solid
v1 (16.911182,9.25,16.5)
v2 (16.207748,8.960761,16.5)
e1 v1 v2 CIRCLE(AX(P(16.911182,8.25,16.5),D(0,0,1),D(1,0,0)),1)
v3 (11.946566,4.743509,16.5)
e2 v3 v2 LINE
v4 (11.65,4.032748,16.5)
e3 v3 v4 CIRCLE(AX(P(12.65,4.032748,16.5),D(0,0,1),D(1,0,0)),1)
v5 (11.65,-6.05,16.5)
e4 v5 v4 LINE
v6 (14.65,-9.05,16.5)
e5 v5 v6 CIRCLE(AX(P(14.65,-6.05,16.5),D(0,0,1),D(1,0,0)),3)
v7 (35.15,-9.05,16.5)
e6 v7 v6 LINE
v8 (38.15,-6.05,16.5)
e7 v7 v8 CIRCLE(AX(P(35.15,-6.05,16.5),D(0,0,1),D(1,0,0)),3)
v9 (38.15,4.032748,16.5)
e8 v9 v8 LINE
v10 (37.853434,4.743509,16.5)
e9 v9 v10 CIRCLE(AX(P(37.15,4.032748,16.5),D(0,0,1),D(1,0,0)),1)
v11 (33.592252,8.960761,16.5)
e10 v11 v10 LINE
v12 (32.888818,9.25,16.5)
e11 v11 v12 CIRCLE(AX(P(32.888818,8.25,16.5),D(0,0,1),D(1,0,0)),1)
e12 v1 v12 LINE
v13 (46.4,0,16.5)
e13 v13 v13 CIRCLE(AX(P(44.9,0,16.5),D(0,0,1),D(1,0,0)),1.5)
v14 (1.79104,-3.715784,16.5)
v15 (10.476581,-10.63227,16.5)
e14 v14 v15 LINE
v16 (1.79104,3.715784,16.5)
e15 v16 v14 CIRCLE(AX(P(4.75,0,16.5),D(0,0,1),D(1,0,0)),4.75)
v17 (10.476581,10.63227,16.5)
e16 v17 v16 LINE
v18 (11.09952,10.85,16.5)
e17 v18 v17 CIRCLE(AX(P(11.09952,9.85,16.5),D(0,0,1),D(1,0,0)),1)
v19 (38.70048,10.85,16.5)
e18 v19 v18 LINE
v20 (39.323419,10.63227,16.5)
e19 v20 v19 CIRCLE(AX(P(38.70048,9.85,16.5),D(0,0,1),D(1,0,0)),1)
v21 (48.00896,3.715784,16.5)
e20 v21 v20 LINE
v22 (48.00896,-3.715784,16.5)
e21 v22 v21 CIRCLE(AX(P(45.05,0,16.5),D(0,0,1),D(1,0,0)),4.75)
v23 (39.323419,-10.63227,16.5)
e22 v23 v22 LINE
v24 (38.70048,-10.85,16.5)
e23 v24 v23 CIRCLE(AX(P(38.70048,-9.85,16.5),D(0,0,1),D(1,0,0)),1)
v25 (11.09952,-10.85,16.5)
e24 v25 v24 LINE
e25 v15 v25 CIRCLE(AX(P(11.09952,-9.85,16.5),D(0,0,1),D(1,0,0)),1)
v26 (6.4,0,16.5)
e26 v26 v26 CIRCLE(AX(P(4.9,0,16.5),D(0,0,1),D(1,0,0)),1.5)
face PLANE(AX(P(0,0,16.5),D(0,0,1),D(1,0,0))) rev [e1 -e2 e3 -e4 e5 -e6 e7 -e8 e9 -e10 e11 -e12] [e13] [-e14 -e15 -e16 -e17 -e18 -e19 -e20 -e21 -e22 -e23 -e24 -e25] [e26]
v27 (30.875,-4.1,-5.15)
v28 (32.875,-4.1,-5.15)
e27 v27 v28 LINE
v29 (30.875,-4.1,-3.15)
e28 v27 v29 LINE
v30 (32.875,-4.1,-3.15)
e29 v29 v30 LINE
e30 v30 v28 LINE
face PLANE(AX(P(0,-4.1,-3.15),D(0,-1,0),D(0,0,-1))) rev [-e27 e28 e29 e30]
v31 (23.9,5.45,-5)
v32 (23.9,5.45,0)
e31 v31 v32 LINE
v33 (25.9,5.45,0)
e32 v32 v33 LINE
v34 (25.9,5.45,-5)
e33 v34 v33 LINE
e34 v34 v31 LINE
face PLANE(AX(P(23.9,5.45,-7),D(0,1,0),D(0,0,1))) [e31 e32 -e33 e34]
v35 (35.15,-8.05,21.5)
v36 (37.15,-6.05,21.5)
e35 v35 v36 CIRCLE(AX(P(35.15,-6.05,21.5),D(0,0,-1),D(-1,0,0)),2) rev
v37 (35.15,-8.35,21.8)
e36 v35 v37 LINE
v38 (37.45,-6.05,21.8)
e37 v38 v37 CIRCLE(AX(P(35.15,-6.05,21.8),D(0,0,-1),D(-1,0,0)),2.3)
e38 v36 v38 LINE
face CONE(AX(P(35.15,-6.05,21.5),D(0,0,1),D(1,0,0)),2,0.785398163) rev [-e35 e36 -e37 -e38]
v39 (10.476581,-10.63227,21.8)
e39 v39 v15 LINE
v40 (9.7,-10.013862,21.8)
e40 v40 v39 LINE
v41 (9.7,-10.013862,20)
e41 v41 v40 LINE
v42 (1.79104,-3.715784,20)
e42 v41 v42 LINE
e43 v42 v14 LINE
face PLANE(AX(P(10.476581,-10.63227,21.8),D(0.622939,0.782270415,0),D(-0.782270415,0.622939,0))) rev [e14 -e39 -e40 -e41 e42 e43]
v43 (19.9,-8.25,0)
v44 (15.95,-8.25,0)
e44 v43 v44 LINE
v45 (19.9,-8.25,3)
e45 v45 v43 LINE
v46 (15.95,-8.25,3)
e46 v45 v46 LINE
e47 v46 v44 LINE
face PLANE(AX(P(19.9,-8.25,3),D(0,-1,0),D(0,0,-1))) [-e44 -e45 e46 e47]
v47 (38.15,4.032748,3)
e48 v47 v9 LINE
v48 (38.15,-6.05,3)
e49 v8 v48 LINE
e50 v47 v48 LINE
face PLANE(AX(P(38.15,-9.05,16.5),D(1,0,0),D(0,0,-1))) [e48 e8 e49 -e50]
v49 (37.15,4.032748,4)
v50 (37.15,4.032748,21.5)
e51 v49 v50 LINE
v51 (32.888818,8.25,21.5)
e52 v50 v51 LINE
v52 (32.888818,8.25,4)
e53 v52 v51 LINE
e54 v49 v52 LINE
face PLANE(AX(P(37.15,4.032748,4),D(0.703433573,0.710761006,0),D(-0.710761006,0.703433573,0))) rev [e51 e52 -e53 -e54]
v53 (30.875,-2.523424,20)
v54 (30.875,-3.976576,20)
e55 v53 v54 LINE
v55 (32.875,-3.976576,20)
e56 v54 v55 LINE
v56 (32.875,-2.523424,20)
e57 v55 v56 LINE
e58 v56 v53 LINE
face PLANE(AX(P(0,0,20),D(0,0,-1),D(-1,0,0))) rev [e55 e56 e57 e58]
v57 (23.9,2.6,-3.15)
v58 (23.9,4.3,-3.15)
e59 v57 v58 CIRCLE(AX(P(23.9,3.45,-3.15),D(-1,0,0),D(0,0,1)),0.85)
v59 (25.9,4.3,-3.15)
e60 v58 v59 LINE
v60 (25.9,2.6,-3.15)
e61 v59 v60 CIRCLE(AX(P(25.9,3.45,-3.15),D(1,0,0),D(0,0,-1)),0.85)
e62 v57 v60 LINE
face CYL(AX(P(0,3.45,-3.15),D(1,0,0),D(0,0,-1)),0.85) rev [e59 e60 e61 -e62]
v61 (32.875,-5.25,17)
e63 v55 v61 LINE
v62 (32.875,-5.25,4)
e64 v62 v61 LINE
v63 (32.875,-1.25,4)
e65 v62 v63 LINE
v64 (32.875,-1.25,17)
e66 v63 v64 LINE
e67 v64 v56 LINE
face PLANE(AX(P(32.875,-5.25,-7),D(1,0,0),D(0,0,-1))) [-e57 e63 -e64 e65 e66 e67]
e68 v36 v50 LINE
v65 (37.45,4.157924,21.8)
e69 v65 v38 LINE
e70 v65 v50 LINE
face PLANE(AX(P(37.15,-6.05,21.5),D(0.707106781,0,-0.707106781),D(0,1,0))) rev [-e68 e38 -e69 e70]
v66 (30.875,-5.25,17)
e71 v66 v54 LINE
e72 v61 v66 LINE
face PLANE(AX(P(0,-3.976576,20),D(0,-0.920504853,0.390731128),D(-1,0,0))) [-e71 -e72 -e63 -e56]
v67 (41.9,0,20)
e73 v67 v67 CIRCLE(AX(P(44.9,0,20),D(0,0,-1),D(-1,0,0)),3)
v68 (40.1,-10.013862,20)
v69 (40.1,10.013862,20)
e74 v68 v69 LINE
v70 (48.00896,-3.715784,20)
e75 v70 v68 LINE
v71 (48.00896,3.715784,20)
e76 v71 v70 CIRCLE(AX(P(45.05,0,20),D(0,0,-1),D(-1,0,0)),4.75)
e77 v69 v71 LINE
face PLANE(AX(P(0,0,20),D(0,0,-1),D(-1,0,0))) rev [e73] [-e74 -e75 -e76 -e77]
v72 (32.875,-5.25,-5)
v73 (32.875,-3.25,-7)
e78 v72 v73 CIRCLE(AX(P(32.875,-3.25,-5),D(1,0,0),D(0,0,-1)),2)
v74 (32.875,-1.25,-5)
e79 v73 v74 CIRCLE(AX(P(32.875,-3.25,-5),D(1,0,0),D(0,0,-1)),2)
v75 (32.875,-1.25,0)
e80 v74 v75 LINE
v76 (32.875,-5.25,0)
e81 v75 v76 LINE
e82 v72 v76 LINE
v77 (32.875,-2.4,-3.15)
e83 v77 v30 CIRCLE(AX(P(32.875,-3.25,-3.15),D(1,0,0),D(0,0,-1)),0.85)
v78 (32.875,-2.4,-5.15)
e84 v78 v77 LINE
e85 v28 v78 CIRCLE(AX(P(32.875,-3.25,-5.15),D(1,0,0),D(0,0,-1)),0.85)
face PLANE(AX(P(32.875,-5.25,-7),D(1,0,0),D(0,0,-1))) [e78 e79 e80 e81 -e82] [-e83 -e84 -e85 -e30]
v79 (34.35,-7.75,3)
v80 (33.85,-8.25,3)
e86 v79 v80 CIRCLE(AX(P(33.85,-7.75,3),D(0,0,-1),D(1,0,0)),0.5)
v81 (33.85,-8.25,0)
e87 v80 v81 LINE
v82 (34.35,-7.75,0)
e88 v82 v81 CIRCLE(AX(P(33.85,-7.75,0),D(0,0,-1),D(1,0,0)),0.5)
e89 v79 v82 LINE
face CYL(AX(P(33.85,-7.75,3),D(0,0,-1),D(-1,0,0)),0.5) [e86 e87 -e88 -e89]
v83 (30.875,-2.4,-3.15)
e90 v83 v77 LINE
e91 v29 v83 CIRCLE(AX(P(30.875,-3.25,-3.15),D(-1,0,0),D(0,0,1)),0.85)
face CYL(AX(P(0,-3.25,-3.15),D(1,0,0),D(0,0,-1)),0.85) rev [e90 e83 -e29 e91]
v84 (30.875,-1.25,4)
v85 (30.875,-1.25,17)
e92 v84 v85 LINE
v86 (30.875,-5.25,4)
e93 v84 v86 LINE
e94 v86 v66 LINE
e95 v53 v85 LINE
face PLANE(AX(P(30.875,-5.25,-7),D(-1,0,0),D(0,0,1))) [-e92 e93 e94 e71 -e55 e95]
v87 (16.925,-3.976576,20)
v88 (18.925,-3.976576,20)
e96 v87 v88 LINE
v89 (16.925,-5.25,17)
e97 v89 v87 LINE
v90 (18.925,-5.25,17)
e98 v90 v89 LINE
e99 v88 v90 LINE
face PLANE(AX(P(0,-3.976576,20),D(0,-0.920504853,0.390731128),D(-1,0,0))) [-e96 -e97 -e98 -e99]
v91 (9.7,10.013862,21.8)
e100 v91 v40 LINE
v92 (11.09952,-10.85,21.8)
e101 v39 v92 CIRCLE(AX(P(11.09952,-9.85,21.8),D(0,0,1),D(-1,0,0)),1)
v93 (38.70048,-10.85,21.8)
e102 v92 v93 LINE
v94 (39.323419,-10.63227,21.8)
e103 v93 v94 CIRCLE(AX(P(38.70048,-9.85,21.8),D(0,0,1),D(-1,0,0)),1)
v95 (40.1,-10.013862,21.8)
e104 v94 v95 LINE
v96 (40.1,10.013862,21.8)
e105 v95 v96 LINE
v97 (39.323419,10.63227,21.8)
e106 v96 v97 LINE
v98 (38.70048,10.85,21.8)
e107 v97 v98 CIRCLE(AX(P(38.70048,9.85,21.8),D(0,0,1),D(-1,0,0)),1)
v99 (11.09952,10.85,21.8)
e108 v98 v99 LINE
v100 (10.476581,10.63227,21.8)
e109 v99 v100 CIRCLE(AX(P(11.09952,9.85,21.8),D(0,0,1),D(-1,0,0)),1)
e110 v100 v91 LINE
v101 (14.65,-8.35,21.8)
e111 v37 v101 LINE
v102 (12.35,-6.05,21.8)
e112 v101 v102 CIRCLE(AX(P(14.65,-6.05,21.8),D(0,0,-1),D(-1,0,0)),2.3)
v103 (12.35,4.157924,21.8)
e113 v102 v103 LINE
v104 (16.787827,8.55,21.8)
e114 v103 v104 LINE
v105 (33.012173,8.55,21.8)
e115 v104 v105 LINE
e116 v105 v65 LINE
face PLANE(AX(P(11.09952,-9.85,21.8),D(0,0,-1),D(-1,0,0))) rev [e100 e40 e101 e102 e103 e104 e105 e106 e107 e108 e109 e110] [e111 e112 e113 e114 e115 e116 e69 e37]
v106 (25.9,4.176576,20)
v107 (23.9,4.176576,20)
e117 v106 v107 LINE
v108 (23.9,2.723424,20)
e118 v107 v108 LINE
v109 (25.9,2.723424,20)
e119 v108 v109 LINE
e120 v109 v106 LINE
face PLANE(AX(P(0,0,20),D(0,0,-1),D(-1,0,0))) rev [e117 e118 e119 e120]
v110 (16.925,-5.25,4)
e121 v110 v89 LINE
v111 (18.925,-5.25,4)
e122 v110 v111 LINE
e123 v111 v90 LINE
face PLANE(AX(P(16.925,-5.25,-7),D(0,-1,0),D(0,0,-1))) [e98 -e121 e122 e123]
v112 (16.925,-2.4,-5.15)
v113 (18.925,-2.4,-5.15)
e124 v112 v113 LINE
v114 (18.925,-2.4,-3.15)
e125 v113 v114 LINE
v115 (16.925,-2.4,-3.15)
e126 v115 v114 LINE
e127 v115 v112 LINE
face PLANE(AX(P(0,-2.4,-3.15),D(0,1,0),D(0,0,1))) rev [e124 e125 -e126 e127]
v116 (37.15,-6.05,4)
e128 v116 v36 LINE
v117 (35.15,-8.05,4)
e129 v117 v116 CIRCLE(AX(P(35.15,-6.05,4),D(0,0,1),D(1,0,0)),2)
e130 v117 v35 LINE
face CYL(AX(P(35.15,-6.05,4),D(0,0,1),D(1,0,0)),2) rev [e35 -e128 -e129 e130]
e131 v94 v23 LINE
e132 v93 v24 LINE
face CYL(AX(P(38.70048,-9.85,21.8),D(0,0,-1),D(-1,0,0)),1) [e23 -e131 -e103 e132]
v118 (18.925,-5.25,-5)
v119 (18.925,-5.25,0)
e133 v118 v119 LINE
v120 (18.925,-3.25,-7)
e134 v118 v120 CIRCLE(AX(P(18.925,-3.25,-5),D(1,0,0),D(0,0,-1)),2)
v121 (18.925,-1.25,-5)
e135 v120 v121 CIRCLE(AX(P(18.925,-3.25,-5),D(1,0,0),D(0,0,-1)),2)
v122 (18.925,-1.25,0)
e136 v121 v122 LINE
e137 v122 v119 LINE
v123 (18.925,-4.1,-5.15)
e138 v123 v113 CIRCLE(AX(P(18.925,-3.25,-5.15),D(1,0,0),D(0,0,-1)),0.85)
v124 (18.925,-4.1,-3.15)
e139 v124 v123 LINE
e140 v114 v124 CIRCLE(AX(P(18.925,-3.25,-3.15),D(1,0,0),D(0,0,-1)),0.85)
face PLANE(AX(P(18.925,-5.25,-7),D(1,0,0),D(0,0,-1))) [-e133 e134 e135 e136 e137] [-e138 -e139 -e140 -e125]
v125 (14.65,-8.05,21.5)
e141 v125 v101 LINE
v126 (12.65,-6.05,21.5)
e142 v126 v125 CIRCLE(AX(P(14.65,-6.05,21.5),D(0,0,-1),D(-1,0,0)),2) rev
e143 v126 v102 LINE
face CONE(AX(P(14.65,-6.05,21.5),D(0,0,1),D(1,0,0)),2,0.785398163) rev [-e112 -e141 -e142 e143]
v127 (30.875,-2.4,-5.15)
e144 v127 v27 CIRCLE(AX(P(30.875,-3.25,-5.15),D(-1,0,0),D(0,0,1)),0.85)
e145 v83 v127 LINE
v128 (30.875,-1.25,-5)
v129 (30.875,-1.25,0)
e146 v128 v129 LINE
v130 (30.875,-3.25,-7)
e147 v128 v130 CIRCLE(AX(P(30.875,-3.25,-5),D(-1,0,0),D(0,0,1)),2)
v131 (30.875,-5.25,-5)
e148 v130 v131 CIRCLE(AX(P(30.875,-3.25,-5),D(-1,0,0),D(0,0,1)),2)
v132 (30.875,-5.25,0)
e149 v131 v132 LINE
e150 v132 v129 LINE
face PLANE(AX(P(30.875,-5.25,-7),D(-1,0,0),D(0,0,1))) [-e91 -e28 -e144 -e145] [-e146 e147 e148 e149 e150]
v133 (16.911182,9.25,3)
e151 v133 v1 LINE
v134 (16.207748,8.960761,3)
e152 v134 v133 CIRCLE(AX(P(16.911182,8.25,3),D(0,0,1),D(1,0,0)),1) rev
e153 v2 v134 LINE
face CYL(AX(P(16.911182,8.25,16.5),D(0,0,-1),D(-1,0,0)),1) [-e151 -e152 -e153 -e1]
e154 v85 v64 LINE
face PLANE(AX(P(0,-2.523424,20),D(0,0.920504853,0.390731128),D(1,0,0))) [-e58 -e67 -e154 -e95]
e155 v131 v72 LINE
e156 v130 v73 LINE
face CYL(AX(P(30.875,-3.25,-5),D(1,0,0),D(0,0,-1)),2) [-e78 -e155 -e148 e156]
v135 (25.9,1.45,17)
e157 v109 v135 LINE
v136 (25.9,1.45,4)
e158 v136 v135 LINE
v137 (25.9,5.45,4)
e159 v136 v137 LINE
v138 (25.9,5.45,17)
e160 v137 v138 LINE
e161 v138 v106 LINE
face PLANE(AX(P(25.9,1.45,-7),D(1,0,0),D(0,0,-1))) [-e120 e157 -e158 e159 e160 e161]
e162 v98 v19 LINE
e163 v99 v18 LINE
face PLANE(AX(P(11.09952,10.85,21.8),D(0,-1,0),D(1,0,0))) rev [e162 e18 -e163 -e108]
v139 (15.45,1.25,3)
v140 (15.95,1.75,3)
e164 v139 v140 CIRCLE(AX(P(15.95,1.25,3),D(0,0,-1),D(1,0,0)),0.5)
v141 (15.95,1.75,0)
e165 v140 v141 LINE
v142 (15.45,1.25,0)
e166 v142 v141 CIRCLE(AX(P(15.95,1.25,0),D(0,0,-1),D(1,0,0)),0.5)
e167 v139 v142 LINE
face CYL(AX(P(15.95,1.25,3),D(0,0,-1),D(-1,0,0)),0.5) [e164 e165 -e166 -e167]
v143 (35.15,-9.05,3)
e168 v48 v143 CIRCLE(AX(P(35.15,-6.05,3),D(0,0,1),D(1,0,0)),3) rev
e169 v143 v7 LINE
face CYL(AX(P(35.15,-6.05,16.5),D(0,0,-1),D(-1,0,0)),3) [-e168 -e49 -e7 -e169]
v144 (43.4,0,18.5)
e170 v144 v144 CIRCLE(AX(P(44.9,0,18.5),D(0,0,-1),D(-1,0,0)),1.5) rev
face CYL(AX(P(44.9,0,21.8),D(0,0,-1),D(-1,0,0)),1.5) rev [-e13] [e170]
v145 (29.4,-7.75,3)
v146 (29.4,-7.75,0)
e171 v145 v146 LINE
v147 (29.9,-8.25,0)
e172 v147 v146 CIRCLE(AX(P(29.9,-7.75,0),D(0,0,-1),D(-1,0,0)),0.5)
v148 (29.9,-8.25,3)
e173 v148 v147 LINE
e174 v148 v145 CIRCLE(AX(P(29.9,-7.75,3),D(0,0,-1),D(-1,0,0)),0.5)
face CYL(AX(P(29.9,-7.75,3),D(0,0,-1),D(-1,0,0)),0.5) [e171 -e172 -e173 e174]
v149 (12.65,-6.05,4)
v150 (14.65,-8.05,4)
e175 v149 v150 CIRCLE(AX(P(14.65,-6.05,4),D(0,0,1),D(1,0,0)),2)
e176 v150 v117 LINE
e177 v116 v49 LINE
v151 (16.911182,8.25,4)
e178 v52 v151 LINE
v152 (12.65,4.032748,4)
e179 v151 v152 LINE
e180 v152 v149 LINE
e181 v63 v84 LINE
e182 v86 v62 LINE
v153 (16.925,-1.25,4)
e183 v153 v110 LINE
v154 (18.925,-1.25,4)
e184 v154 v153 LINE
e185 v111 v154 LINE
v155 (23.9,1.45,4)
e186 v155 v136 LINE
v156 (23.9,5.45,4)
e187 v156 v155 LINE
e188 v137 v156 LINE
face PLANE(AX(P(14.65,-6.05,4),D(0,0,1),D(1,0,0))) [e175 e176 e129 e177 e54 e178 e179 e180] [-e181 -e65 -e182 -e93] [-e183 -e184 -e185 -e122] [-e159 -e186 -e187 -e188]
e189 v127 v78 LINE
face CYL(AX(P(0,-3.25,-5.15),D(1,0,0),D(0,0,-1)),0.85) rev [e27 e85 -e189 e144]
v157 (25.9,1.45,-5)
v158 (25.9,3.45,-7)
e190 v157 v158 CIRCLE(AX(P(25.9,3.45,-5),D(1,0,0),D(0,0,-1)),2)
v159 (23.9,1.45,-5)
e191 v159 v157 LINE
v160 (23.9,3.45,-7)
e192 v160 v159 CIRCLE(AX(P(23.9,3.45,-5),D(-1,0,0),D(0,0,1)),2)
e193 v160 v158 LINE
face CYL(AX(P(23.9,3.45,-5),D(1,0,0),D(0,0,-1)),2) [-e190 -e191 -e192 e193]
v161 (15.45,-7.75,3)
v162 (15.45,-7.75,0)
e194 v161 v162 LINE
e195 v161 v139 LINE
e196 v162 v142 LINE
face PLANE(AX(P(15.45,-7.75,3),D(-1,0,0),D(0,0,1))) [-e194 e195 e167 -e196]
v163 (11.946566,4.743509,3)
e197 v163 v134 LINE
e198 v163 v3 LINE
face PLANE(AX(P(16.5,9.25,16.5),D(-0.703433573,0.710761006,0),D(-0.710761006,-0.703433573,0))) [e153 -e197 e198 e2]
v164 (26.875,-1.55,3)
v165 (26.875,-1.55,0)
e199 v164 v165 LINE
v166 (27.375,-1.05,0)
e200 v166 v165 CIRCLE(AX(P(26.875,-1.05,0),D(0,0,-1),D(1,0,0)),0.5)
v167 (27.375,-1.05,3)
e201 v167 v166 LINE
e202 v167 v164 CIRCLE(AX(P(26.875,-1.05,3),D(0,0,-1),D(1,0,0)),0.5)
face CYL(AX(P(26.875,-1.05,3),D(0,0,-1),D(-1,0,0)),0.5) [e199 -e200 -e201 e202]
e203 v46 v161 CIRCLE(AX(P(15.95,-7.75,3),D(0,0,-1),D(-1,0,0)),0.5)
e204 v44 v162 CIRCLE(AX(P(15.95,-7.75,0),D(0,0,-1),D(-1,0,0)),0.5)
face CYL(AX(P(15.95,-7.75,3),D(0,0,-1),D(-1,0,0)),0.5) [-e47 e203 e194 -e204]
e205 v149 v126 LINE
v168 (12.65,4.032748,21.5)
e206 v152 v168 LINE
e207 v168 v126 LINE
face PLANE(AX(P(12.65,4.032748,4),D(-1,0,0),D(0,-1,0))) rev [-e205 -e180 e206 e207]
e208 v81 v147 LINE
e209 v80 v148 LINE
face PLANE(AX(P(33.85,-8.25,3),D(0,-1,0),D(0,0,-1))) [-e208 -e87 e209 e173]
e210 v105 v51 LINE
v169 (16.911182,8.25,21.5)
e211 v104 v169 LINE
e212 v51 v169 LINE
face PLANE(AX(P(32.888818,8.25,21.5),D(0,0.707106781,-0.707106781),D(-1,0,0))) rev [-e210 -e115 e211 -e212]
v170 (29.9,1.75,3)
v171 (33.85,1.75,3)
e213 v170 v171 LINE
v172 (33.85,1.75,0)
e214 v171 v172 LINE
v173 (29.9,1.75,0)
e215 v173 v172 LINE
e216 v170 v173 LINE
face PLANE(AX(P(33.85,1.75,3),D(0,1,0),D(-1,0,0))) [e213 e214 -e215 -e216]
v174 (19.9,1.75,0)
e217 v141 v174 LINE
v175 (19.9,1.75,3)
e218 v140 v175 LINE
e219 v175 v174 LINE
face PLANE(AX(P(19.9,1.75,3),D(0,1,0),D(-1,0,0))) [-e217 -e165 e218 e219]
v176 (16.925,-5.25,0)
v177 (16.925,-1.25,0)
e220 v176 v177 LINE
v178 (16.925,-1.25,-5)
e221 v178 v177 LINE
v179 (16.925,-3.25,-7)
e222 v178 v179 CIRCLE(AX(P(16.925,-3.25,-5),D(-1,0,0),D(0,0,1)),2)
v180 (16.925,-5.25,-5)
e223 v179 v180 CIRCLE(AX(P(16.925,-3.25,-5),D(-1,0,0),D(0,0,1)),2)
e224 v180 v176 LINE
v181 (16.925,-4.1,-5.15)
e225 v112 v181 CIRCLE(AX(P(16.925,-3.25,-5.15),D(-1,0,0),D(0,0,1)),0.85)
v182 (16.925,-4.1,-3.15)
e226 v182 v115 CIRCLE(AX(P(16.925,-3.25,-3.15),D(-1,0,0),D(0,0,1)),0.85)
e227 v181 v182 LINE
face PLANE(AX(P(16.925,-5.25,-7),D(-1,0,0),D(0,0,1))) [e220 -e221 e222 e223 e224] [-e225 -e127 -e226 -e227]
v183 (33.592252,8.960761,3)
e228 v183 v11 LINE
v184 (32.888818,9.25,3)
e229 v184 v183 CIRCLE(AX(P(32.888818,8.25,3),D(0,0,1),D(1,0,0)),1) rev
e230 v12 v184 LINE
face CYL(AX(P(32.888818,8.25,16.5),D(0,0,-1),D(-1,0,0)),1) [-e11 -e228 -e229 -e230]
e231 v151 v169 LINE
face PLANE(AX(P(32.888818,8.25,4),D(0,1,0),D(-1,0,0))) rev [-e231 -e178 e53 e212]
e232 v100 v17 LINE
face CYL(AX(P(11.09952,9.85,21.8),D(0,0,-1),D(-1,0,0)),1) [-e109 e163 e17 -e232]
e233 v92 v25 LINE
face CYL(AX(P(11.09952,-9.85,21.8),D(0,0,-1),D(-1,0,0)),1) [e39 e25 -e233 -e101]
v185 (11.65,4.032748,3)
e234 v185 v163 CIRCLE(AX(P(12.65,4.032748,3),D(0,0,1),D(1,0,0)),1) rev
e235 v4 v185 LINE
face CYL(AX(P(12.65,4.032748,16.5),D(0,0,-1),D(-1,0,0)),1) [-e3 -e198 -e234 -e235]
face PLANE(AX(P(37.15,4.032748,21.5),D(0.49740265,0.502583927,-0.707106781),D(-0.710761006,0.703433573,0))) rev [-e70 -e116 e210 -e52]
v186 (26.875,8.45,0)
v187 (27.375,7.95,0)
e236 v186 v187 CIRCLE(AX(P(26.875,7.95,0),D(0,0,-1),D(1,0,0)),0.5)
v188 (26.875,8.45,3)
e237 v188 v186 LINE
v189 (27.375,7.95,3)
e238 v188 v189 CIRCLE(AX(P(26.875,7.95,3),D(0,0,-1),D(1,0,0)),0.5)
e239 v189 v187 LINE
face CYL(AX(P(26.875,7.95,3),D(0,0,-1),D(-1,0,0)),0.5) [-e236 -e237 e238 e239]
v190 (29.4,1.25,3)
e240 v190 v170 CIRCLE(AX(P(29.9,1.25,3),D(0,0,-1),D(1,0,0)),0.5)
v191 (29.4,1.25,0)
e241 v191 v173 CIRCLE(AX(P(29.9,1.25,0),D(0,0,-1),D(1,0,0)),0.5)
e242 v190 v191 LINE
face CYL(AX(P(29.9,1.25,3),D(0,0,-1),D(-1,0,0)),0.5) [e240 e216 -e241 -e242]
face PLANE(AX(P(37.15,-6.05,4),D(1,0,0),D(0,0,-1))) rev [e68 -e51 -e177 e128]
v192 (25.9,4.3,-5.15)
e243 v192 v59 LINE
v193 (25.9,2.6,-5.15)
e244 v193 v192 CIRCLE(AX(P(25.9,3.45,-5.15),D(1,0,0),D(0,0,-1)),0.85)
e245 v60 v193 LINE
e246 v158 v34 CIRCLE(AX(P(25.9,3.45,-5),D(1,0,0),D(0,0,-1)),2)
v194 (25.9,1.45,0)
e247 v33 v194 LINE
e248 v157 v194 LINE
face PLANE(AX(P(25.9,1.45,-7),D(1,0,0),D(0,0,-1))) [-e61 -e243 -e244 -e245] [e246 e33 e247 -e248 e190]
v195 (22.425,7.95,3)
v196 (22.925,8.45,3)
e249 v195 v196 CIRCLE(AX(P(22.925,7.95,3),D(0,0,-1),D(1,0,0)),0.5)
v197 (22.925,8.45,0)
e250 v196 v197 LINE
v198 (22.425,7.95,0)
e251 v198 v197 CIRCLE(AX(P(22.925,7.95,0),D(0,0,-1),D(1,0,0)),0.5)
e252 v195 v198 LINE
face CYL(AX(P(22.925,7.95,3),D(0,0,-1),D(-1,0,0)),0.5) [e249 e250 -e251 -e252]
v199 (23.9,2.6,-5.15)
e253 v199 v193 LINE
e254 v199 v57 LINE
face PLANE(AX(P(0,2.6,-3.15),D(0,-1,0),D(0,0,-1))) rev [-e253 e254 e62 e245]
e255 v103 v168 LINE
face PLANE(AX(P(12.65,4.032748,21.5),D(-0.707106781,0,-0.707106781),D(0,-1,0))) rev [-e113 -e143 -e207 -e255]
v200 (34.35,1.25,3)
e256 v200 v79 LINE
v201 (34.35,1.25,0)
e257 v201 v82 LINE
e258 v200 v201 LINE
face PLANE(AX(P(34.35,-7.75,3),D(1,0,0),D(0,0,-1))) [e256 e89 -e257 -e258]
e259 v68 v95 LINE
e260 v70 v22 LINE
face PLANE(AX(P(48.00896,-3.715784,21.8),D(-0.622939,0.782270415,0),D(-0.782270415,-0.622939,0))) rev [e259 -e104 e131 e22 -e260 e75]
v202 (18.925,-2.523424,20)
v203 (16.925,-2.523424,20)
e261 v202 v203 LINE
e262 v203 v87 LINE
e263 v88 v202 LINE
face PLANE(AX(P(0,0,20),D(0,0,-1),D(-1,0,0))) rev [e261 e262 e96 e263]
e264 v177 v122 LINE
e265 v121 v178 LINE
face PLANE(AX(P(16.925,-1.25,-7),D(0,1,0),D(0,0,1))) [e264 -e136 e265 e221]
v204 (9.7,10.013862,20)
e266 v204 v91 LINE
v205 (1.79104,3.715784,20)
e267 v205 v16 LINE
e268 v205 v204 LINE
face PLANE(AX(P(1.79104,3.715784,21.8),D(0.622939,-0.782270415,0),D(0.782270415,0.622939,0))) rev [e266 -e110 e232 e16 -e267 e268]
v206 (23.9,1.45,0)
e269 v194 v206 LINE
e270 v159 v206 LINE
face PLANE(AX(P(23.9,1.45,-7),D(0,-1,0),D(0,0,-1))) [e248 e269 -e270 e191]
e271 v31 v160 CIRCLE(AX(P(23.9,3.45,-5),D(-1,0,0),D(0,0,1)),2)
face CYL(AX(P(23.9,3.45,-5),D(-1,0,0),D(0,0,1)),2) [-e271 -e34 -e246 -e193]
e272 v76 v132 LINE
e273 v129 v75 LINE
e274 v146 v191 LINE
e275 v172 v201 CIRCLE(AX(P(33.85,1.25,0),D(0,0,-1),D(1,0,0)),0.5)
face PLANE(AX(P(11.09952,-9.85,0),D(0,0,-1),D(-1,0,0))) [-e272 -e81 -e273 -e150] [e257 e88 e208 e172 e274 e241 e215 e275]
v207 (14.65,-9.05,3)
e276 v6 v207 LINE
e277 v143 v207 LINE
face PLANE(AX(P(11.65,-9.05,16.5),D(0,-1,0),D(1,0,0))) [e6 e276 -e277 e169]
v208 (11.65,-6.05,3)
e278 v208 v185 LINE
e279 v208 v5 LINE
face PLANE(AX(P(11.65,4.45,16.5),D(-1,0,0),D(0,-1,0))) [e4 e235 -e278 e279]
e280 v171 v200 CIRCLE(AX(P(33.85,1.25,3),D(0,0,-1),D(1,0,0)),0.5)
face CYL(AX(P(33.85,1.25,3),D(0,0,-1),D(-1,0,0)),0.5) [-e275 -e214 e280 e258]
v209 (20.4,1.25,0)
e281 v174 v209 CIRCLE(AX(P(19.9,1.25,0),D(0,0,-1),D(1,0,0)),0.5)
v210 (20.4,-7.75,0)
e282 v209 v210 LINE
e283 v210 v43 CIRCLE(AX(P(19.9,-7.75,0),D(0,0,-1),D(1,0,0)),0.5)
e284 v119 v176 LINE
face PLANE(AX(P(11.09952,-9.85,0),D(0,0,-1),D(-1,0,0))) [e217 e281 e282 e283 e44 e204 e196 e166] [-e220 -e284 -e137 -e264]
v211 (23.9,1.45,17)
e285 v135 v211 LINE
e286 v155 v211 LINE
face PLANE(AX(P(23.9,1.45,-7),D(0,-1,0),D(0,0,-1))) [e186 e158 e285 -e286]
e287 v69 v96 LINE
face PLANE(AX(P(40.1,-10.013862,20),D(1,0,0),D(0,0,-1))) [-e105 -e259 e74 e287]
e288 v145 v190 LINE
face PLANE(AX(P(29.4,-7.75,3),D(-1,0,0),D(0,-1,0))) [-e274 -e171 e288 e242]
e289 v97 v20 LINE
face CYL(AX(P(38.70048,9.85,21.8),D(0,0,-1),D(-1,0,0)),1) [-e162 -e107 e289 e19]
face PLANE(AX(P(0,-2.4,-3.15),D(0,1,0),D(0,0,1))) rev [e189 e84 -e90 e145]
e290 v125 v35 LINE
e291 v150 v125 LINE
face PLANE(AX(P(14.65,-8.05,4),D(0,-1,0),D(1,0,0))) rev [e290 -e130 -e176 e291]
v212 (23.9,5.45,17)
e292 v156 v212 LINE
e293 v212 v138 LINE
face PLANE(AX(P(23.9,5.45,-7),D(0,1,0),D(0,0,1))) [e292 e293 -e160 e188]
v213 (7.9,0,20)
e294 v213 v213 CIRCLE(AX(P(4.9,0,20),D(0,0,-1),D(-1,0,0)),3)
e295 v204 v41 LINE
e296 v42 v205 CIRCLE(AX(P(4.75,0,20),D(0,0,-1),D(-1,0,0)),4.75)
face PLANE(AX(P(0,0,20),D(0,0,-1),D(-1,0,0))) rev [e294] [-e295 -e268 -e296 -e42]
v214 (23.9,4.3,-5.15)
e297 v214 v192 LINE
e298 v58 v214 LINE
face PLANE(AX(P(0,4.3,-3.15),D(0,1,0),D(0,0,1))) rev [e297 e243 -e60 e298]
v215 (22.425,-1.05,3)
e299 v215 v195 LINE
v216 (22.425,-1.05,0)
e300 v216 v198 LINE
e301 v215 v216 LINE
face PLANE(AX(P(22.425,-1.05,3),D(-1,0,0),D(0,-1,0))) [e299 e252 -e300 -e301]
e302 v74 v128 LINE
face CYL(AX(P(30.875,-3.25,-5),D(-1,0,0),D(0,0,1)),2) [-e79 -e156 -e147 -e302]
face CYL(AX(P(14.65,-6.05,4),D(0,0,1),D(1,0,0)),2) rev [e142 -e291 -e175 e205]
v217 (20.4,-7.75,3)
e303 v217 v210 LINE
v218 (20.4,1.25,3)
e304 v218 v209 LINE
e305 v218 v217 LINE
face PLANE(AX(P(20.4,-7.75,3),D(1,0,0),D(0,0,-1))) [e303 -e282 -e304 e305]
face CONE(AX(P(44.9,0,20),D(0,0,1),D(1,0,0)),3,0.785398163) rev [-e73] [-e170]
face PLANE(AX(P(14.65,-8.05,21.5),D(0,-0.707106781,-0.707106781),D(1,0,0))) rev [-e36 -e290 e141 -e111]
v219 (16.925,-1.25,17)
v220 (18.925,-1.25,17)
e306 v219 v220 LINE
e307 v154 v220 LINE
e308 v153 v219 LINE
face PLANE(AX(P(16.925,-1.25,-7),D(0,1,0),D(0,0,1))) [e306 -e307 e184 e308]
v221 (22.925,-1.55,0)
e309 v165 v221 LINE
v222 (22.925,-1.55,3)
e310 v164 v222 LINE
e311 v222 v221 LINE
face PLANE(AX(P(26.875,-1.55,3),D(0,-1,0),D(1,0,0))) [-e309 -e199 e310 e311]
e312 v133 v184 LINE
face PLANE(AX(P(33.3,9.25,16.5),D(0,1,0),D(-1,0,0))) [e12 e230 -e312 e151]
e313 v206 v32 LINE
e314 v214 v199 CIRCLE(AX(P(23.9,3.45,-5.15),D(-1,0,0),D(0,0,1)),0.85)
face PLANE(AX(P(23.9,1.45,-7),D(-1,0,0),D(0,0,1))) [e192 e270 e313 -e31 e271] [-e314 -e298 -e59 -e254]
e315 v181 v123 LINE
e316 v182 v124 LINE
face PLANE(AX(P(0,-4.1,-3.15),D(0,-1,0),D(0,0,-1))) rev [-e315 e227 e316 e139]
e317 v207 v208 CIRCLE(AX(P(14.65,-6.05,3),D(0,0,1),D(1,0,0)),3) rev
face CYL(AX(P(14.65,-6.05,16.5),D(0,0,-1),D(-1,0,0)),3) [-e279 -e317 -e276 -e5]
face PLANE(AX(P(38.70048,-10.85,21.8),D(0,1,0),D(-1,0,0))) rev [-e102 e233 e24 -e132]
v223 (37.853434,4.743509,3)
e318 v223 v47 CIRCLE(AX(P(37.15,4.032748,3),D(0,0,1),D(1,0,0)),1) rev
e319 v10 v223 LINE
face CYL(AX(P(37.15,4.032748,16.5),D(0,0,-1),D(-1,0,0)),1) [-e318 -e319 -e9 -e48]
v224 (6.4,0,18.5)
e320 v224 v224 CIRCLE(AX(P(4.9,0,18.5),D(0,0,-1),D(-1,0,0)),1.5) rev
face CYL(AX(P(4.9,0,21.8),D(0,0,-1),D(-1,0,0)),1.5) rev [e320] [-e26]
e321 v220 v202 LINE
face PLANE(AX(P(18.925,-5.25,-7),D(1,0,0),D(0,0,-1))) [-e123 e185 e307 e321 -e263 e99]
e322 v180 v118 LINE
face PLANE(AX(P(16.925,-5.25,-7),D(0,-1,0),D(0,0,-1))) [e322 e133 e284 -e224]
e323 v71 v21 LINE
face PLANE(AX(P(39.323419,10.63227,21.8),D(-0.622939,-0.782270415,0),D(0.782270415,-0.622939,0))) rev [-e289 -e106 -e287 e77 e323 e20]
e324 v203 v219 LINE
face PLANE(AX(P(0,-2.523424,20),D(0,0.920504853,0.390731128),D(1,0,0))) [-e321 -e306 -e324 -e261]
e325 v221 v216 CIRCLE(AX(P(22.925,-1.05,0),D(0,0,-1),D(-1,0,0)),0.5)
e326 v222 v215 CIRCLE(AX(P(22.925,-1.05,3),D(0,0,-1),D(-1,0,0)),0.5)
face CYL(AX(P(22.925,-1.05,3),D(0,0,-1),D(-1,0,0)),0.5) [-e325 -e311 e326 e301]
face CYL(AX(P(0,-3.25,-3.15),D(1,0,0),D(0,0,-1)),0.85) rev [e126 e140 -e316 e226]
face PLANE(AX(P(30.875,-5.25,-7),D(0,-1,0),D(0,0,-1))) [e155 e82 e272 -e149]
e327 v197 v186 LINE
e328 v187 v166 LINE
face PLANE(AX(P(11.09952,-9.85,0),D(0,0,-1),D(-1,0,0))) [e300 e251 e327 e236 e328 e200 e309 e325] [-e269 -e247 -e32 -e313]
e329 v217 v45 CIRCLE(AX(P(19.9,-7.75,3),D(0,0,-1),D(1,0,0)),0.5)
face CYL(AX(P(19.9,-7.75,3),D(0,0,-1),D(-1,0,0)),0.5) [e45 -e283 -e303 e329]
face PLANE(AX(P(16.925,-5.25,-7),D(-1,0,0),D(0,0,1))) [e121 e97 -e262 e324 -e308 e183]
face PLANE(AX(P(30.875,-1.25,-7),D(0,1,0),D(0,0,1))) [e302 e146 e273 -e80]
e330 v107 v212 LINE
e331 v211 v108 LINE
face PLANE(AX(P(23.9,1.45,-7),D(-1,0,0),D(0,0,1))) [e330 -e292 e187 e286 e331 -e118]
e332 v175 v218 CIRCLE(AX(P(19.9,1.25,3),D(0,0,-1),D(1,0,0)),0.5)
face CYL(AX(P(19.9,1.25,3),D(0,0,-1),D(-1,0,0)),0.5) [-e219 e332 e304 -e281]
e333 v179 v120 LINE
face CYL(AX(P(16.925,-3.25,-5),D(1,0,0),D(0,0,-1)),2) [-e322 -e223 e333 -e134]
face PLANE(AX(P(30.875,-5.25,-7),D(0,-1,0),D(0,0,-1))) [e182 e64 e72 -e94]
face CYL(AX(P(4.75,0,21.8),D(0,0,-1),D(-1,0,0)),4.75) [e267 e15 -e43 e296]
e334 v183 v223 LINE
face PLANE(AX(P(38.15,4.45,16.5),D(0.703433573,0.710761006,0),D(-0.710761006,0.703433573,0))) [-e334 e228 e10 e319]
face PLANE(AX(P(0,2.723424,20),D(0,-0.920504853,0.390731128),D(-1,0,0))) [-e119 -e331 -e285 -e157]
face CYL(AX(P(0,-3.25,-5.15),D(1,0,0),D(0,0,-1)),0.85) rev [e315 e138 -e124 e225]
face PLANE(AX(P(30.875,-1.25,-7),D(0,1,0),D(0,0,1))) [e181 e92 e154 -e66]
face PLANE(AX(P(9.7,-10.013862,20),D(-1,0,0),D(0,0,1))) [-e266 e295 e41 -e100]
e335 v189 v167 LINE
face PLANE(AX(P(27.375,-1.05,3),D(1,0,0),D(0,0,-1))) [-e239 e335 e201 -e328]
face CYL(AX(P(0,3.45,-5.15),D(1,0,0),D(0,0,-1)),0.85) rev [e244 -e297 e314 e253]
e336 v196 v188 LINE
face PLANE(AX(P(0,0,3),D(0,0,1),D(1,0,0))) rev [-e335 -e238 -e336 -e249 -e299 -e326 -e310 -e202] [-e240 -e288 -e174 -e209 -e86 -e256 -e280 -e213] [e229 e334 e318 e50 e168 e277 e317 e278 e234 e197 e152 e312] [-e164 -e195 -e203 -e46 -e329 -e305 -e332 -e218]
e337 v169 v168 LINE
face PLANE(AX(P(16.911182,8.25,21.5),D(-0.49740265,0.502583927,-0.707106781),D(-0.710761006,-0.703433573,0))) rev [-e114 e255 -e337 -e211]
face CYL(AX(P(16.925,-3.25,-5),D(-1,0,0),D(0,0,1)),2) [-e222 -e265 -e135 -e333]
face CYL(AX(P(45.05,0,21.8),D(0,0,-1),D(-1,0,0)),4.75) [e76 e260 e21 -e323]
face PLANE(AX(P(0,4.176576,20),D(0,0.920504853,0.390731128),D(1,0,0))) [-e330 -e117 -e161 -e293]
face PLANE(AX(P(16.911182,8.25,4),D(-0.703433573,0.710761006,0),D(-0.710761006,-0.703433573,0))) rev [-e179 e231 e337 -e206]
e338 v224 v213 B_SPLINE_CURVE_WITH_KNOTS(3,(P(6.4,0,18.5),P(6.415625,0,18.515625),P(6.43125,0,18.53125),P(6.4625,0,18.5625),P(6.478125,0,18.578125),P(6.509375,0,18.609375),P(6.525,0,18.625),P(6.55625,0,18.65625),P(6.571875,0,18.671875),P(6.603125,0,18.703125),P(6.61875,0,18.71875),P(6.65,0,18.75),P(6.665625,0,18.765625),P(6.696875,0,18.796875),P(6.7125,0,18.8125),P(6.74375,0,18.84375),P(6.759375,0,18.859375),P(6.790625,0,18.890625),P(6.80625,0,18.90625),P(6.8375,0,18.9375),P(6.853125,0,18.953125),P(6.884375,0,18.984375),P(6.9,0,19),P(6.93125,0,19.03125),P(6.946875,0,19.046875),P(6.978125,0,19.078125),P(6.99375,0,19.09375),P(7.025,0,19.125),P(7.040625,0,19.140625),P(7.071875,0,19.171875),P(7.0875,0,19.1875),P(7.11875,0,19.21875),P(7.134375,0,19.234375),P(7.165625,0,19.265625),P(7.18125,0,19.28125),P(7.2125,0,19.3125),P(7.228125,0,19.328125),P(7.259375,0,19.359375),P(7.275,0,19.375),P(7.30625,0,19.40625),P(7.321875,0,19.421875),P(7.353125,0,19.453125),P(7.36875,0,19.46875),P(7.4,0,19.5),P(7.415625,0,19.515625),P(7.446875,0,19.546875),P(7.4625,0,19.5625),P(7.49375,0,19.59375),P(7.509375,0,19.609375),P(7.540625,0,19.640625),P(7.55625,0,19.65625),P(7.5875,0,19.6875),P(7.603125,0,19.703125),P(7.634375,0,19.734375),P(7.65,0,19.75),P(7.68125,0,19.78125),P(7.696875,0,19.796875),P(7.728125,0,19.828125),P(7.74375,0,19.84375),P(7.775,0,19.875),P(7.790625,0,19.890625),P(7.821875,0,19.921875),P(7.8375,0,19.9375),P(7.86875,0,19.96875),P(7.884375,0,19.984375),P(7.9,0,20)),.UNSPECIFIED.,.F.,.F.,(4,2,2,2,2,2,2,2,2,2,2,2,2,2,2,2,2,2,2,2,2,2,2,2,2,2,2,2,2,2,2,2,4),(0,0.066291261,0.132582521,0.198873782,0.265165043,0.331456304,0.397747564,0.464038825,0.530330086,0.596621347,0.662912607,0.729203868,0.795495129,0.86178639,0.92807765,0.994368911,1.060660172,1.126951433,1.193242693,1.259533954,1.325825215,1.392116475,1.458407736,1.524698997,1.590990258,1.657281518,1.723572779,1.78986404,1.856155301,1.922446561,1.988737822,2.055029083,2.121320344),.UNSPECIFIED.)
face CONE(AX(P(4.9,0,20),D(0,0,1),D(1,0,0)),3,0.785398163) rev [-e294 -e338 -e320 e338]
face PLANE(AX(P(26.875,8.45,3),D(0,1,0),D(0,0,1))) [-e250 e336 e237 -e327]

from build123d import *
from OCP.BRepFilletAPI import BRepFilletAPI_MakeChamfer

# Parameters (mm, degrees)
SKETCH1_R               = 1.5
BOSS_EXTRUDE1_DEPTH     = 21.8
CUT_EXTRUDE1_START      = -1.8
SKETCH2_W               = 54.830632019
SKETCH2_H               = 32.18582254
CUT_EXTRUDE1_DEPTH      = 1.8
SKETCH3_W               = 57.724078453
SKETCH3_H               = 32.716020725
CUT_EXTRUDE2_DEPTH      = 16.5
FILLET1_R               = 3
FILLET2_R               = 1
CUT_EXTRUDE3_DEPTH      = 17.8
CHAMFER1_SIZE           = 0.3
CHAMFER2_SIZE           = 1.5
SKETCH5_W               = 33.078515986
SKETCH5_H               = 22.592086676
CUT_EXTRUDE4_DEPTH      = 3
SKETCH6_W               = 2
SKETCH6_H               = 4
BOSS_EXTRUDE2_DEPTH     = 27
CHAMFER3_SIZE           = 3
CHAMFER3_SIZE2          = 1.273424449
CUT_EXTRUDE5_DEPTH      = 36.549578057
CUT_EXTRUDE5_DEPTH_BACK = 36.549578057
FILLET3_R               = 2


with BuildPart() as part:
    # Sketch1 → Boss-Extrude1 (new body)
    with BuildSketch(Plane.XY):
        with BuildLine():
            Line((1.791039749, 3.715784471), (10.476580913, 10.632270415))
            ThreePointArc((10.476580913, 10.632270415), (10.769573262, 10.79399958), (11.099519913, 10.85))
            Line((11.099519913, 10.85), (38.700480087, 10.85))
            ThreePointArc((38.700480087, 10.85), (39.030426738, 10.79399958), (39.323419087, 10.632270415))
            Line((39.323419087, 10.632270415), (48.008960251, 3.715784471))
            ThreePointArc((48.008960251, 3.715784471), (49.8, 0), (48.008960251, -3.715784471))
            Line((48.008960251, -3.715784471), (39.323419087, -10.632270415))
            ThreePointArc((39.323419087, -10.632270415), (39.030426738, -10.79399958), (38.700480087, -10.85))
            Line((38.700480087, -10.85), (11.099519913, -10.85))
            ThreePointArc((11.099519913, -10.85), (10.769573262, -10.79399958), (10.476580913, -10.632270415))
            Line((10.476580913, -10.632270415), (1.791039749, -3.715784471))
            ThreePointArc((1.791039749, -3.715784471), (0, 0), (1.791039749, 3.715784471))
        make_face()
        with Locations((4.9, 0)):
            Circle(SKETCH1_R, mode=Mode.SUBTRACT)
        with Locations((44.9, 0)):
            Circle(SKETCH1_R, mode=Mode.SUBTRACT)
    extrude(amount=BOSS_EXTRUDE1_DEPTH)

    # Sketch2 → Cut-Extrude1 (cut)
    with BuildSketch(Plane.XY.offset(21.8).offset(CUT_EXTRUDE1_START)):
        with Locations((23.298408534, -3.305326345)):
            Rectangle(SKETCH2_W, SKETCH2_H)
        with BuildLine():
            Line((11.099519913, -10.85), (38.700480087, -10.85))
            ThreePointArc((38.700480087, -10.85), (39.030426738, -10.79399958), (39.323419087, -10.632270415))
            Line((39.323419087, -10.632270415), (40.1, -10.013862089))
            Line((40.1, -10.013862089), (40.1, 10.013862089))
            Line((40.1, 10.013862089), (39.323419087, 10.632270415))
            ThreePointArc((39.323419087, 10.632270415), (39.030426738, 10.79399958), (38.700480087, 10.85))
            Line((38.700480087, 10.85), (11.099519913, 10.85))
            ThreePointArc((11.099519913, 10.85), (10.769573262, 10.79399958), (10.476580913, 10.632270415))
            Line((10.476580913, 10.632270415), (9.7, 10.013862089))
            Line((9.7, 10.013862089), (9.7, -10.013862089))
            Line((9.7, -10.013862089), (10.476580913, -10.632270415))
            ThreePointArc((10.476580913, -10.632270415), (10.769573262, -10.79399958), (11.099519913, -10.85))
        make_face(mode=Mode.SUBTRACT)
    extrude(amount=CUT_EXTRUDE1_DEPTH, mode=Mode.SUBTRACT)

    # Sketch3 → Cut-Extrude2 (cut)
    with BuildSketch(Plane(origin=(0, 0, 0), x_dir=(-1, 0, 0), z_dir=(0, 0, -1))):
        with Locations((-24.814355967, -1.741428677)):
            Rectangle(SKETCH3_W, SKETCH3_H)
        Polygon((-38.15, -9.05), (-38.15, 4.45), (-33.3, 9.25), (-16.5, 9.25), (-11.65, 4.45), (-11.65, -9.05), align=None, mode=Mode.SUBTRACT)
    extrude(amount=-CUT_EXTRUDE2_DEPTH, mode=Mode.SUBTRACT)

    # Fillet1
    fillet1_edges = [part.edges().sort_by_distance(p)[0] for p in [
        (38.15, -9.05, 8.25),
        (11.65, -9.05, 8.25),
    ]]
    fillet(fillet1_edges, radius=FILLET1_R)

    # Fillet2
    fillet2_edges = [part.edges().sort_by_distance(p)[0] for p in [
        (38.15, 4.45, 8.25),
        (33.3, 9.25, 8.25),
        (16.5, 9.25, 8.25),
        (11.65, 4.45, 8.25),
    ]]
    fillet(fillet2_edges, radius=FILLET2_R)

    # Sketch4 → Cut-Extrude3 (cut)
    with BuildSketch(Plane.XY.offset(21.8)):
        with BuildLine():
            Line((37.15, 4.032748035), (32.888818327, 8.25))
            Line((32.888818327, 8.25), (16.911181673, 8.25))
            Line((16.911181673, 8.25), (12.65, 4.032748035))
            Line((12.65, 4.032748035), (12.65, -6.05))
            ThreePointArc((12.65, -6.05), (13.235786438, -7.464213562), (14.65, -8.05))
            Line((14.65, -8.05), (35.15, -8.05))
            ThreePointArc((35.15, -8.05), (36.564213562, -7.464213562), (37.15, -6.05))
            Line((37.15, -6.05), (37.15, 4.032748035))
        make_face()
    extrude(amount=-CUT_EXTRUDE3_DEPTH, mode=Mode.SUBTRACT)

    # Chamfer1
    chamfer1_edges = [part.edges().sort_by_distance(p)[0] for p in [
        (37.15, -1.008625983, 21.8),
        (35.019409163, 6.141374017, 21.8),
        (24.9, 8.25, 21.8),
        (14.780590837, 6.141374017, 21.8),
        (12.65, -1.008625983, 21.8),
        (13.235786438, -7.464213562, 21.8),
        (24.9, -8.05, 21.8),
        (36.564213562, -7.464213562, 21.8),
    ]]
    chamfer(chamfer1_edges, length=CHAMFER1_SIZE)

    # Chamfer2
    chamfer2_edges = [part.edges().sort_by_distance(p)[0] for p in [
        (3.4, 0, 20),
        (43.4, 0, 20),
    ]]
    chamfer(chamfer2_edges, length=CHAMFER2_SIZE)

    # Sketch5 → Cut-Extrude4 (cut)
    with BuildSketch(Plane(origin=(0, 0, 0), x_dir=(-1, 0, 0), z_dir=(0, 0, -1))):
        with Locations((-24.236330555, -0.057007702)):
            Rectangle(SKETCH5_W, SKETCH5_H)
        with BuildLine():
            Line((-26.875, -1.55), (-22.925, -1.55))
            ThreePointArc((-22.925, -1.55), (-22.571446609, -1.403553391), (-22.425, -1.05))
            Line((-22.425, -1.05), (-22.425, 7.95))
            ThreePointArc((-22.425, 7.95), (-22.571446609, 8.303553391), (-22.925, 8.45))
            Line((-22.925, 8.45), (-26.875, 8.45))
            ThreePointArc((-26.875, 8.45), (-27.228553391, 8.303553391), (-27.375, 7.95))
            Line((-27.375, 7.95), (-27.375, -1.05))
            ThreePointArc((-27.375, -1.05), (-27.228553391, -1.403553391), (-26.875, -1.55))
        make_face(mode=Mode.SUBTRACT)
        with BuildLine():
            Line((-19.9, -8.25), (-15.95, -8.25))
            ThreePointArc((-15.95, -8.25), (-15.596446609, -8.103553391), (-15.45, -7.75))
            Line((-15.45, -7.75), (-15.45, 1.25))
            ThreePointArc((-15.45, 1.25), (-15.596446609, 1.603553391), (-15.95, 1.75))
            Line((-15.95, 1.75), (-19.9, 1.75))
            ThreePointArc((-19.9, 1.75), (-20.253553391, 1.603553391), (-20.4, 1.25))
            Line((-20.4, 1.25), (-20.4, -7.75))
            ThreePointArc((-20.4, -7.75), (-20.253553391, -8.103553391), (-19.9, -8.25))
        make_face(mode=Mode.SUBTRACT)
        with BuildLine():
            Line((-33.85, -8.25), (-29.9, -8.25))
            ThreePointArc((-29.9, -8.25), (-29.546446609, -8.103553391), (-29.4, -7.75))
            Line((-29.4, -7.75), (-29.4, 1.25))
            ThreePointArc((-29.4, 1.25), (-29.546446609, 1.603553391), (-29.9, 1.75))
            Line((-29.9, 1.75), (-33.85, 1.75))
            ThreePointArc((-33.85, 1.75), (-34.203553391, 1.603553391), (-34.35, 1.25))
            Line((-34.35, 1.25), (-34.35, -7.75))
            ThreePointArc((-34.35, -7.75), (-34.203553391, -8.103553391), (-33.85, -8.25))
        make_face(mode=Mode.SUBTRACT)
    extrude(amount=-CUT_EXTRUDE4_DEPTH, mode=Mode.SUBTRACT)

    # Sketch6 → Boss-Extrude2 (add)
    with BuildSketch(Plane.XY.offset(20)):
        with Locations((24.9, 3.45)):
            Rectangle(SKETCH6_W, SKETCH6_H)
        with Locations((17.925, -3.25)):
            Rectangle(SKETCH6_W, SKETCH6_H)
        with Locations((31.875, -3.25)):
            Rectangle(SKETCH6_W, SKETCH6_H)
    extrude(amount=-BOSS_EXTRUDE2_DEPTH)

    # Chamfer3: one chamfer whose edges measure the first distance from different faces: ONE call of the kernel's chamfer builder (chamfer() names one face for all edges)
    chamfer3_edges_1 = [part.edges().sort_by_distance(p)[0] for p in [
        (24.9, 1.45, 20),
    ]]
    chamfer3_side_1 = [part.faces().sort_by_distance(p)[0] for p in [
        (24.9, 1.45, 12),
    ]]
    chamfer3_edges_2 = [part.edges().sort_by_distance(p)[0] for p in [
        (24.9, 5.45, 20),
    ]]
    chamfer3_side_2 = [part.faces().sort_by_distance(p)[0] for p in [
        (24.9, 5.45, 12),
    ]]
    chamfer3_edges_3 = [part.edges().sort_by_distance(p)[0] for p in [
        (17.925, -5.25, 20),
    ]]
    chamfer3_side_3 = [part.faces().sort_by_distance(p)[0] for p in [
        (17.925, -5.25, 12),
    ]]
    chamfer3_edges_4 = [part.edges().sort_by_distance(p)[0] for p in [
        (17.925, -1.25, 20),
    ]]
    chamfer3_side_4 = [part.faces().sort_by_distance(p)[0] for p in [
        (17.925, -1.25, 12),
    ]]
    chamfer3_edges_5 = [part.edges().sort_by_distance(p)[0] for p in [
        (31.875, -5.25, 20),
    ]]
    chamfer3_side_5 = [part.faces().sort_by_distance(p)[0] for p in [
        (31.875, -5.25, 12),
    ]]
    chamfer3_edges_6 = [part.edges().sort_by_distance(p)[0] for p in [
        (31.875, -1.25, 20),
    ]]
    chamfer3_side_6 = [part.faces().sort_by_distance(p)[0] for p in [
        (31.875, -1.25, 12),
    ]]
    chamfer3 = BRepFilletAPI_MakeChamfer(part.part.solid().wrapped)
    for e in chamfer3_edges_1:
        chamfer3.Add(CHAMFER3_SIZE, CHAMFER3_SIZE2, e.wrapped, chamfer3_side_1[0].wrapped)  # the first distance lies on this face
    for e in chamfer3_edges_2:
        chamfer3.Add(CHAMFER3_SIZE, CHAMFER3_SIZE2, e.wrapped, chamfer3_side_2[0].wrapped)  # the first distance lies on this face
    for e in chamfer3_edges_3:
        chamfer3.Add(CHAMFER3_SIZE, CHAMFER3_SIZE2, e.wrapped, chamfer3_side_3[0].wrapped)  # the first distance lies on this face
    for e in chamfer3_edges_4:
        chamfer3.Add(CHAMFER3_SIZE, CHAMFER3_SIZE2, e.wrapped, chamfer3_side_4[0].wrapped)  # the first distance lies on this face
    for e in chamfer3_edges_5:
        chamfer3.Add(CHAMFER3_SIZE, CHAMFER3_SIZE2, e.wrapped, chamfer3_side_5[0].wrapped)  # the first distance lies on this face
    for e in chamfer3_edges_6:
        chamfer3.Add(CHAMFER3_SIZE, CHAMFER3_SIZE2, e.wrapped, chamfer3_side_6[0].wrapped)  # the first distance lies on this face
    add(Compound.cast(chamfer3.Shape()), mode=Mode.REPLACE)

    # Sketch7 → Cut-Extrude5 (cut, two sides: drawn at the far end of the back side and taken through both)
    with BuildSketch(Plane(origin=(25.9, 0, 0), x_dir=(0, 0, -1), z_dir=(1, 0, 0)).offset(-CUT_EXTRUDE5_DEPTH_BACK)):
        with BuildLine():
            Line((3.15, 4.3), (5.15, 4.3))
            ThreePointArc((5.15, 4.3), (6, 3.45), (5.15, 2.6))
            Line((5.15, 2.6), (3.15, 2.6))
            ThreePointArc((3.15, 2.6), (2.3, 3.45), (3.15, 4.3))
        make_face()
        with BuildLine():
            Line((3.15, -2.4), (5.15, -2.4))
            ThreePointArc((5.15, -2.4), (6, -3.25), (5.15, -4.1))
            Line((5.15, -4.1), (3.15, -4.1))
            ThreePointArc((3.15, -4.1), (2.3, -3.25), (3.15, -2.4))
        make_face()
    extrude(amount=CUT_EXTRUDE5_DEPTH + CUT_EXTRUDE5_DEPTH_BACK, mode=Mode.SUBTRACT)

    # Fillet3
    fillet3_edges = [part.edges().sort_by_distance(p)[0] for p in [
        (31.875, -5.25, -7),
        (31.875, -1.25, -7),
        (17.925, -5.25, -7),
        (24.9, 1.45, -7),
        (17.925, -1.25, -7),
        (24.9, 5.45, -7),
    ]]
    fillet(fillet3_edges, radius=FILLET3_R - 0.0001)  # a hair under: the kernel refuses the full size


solid = part.part
